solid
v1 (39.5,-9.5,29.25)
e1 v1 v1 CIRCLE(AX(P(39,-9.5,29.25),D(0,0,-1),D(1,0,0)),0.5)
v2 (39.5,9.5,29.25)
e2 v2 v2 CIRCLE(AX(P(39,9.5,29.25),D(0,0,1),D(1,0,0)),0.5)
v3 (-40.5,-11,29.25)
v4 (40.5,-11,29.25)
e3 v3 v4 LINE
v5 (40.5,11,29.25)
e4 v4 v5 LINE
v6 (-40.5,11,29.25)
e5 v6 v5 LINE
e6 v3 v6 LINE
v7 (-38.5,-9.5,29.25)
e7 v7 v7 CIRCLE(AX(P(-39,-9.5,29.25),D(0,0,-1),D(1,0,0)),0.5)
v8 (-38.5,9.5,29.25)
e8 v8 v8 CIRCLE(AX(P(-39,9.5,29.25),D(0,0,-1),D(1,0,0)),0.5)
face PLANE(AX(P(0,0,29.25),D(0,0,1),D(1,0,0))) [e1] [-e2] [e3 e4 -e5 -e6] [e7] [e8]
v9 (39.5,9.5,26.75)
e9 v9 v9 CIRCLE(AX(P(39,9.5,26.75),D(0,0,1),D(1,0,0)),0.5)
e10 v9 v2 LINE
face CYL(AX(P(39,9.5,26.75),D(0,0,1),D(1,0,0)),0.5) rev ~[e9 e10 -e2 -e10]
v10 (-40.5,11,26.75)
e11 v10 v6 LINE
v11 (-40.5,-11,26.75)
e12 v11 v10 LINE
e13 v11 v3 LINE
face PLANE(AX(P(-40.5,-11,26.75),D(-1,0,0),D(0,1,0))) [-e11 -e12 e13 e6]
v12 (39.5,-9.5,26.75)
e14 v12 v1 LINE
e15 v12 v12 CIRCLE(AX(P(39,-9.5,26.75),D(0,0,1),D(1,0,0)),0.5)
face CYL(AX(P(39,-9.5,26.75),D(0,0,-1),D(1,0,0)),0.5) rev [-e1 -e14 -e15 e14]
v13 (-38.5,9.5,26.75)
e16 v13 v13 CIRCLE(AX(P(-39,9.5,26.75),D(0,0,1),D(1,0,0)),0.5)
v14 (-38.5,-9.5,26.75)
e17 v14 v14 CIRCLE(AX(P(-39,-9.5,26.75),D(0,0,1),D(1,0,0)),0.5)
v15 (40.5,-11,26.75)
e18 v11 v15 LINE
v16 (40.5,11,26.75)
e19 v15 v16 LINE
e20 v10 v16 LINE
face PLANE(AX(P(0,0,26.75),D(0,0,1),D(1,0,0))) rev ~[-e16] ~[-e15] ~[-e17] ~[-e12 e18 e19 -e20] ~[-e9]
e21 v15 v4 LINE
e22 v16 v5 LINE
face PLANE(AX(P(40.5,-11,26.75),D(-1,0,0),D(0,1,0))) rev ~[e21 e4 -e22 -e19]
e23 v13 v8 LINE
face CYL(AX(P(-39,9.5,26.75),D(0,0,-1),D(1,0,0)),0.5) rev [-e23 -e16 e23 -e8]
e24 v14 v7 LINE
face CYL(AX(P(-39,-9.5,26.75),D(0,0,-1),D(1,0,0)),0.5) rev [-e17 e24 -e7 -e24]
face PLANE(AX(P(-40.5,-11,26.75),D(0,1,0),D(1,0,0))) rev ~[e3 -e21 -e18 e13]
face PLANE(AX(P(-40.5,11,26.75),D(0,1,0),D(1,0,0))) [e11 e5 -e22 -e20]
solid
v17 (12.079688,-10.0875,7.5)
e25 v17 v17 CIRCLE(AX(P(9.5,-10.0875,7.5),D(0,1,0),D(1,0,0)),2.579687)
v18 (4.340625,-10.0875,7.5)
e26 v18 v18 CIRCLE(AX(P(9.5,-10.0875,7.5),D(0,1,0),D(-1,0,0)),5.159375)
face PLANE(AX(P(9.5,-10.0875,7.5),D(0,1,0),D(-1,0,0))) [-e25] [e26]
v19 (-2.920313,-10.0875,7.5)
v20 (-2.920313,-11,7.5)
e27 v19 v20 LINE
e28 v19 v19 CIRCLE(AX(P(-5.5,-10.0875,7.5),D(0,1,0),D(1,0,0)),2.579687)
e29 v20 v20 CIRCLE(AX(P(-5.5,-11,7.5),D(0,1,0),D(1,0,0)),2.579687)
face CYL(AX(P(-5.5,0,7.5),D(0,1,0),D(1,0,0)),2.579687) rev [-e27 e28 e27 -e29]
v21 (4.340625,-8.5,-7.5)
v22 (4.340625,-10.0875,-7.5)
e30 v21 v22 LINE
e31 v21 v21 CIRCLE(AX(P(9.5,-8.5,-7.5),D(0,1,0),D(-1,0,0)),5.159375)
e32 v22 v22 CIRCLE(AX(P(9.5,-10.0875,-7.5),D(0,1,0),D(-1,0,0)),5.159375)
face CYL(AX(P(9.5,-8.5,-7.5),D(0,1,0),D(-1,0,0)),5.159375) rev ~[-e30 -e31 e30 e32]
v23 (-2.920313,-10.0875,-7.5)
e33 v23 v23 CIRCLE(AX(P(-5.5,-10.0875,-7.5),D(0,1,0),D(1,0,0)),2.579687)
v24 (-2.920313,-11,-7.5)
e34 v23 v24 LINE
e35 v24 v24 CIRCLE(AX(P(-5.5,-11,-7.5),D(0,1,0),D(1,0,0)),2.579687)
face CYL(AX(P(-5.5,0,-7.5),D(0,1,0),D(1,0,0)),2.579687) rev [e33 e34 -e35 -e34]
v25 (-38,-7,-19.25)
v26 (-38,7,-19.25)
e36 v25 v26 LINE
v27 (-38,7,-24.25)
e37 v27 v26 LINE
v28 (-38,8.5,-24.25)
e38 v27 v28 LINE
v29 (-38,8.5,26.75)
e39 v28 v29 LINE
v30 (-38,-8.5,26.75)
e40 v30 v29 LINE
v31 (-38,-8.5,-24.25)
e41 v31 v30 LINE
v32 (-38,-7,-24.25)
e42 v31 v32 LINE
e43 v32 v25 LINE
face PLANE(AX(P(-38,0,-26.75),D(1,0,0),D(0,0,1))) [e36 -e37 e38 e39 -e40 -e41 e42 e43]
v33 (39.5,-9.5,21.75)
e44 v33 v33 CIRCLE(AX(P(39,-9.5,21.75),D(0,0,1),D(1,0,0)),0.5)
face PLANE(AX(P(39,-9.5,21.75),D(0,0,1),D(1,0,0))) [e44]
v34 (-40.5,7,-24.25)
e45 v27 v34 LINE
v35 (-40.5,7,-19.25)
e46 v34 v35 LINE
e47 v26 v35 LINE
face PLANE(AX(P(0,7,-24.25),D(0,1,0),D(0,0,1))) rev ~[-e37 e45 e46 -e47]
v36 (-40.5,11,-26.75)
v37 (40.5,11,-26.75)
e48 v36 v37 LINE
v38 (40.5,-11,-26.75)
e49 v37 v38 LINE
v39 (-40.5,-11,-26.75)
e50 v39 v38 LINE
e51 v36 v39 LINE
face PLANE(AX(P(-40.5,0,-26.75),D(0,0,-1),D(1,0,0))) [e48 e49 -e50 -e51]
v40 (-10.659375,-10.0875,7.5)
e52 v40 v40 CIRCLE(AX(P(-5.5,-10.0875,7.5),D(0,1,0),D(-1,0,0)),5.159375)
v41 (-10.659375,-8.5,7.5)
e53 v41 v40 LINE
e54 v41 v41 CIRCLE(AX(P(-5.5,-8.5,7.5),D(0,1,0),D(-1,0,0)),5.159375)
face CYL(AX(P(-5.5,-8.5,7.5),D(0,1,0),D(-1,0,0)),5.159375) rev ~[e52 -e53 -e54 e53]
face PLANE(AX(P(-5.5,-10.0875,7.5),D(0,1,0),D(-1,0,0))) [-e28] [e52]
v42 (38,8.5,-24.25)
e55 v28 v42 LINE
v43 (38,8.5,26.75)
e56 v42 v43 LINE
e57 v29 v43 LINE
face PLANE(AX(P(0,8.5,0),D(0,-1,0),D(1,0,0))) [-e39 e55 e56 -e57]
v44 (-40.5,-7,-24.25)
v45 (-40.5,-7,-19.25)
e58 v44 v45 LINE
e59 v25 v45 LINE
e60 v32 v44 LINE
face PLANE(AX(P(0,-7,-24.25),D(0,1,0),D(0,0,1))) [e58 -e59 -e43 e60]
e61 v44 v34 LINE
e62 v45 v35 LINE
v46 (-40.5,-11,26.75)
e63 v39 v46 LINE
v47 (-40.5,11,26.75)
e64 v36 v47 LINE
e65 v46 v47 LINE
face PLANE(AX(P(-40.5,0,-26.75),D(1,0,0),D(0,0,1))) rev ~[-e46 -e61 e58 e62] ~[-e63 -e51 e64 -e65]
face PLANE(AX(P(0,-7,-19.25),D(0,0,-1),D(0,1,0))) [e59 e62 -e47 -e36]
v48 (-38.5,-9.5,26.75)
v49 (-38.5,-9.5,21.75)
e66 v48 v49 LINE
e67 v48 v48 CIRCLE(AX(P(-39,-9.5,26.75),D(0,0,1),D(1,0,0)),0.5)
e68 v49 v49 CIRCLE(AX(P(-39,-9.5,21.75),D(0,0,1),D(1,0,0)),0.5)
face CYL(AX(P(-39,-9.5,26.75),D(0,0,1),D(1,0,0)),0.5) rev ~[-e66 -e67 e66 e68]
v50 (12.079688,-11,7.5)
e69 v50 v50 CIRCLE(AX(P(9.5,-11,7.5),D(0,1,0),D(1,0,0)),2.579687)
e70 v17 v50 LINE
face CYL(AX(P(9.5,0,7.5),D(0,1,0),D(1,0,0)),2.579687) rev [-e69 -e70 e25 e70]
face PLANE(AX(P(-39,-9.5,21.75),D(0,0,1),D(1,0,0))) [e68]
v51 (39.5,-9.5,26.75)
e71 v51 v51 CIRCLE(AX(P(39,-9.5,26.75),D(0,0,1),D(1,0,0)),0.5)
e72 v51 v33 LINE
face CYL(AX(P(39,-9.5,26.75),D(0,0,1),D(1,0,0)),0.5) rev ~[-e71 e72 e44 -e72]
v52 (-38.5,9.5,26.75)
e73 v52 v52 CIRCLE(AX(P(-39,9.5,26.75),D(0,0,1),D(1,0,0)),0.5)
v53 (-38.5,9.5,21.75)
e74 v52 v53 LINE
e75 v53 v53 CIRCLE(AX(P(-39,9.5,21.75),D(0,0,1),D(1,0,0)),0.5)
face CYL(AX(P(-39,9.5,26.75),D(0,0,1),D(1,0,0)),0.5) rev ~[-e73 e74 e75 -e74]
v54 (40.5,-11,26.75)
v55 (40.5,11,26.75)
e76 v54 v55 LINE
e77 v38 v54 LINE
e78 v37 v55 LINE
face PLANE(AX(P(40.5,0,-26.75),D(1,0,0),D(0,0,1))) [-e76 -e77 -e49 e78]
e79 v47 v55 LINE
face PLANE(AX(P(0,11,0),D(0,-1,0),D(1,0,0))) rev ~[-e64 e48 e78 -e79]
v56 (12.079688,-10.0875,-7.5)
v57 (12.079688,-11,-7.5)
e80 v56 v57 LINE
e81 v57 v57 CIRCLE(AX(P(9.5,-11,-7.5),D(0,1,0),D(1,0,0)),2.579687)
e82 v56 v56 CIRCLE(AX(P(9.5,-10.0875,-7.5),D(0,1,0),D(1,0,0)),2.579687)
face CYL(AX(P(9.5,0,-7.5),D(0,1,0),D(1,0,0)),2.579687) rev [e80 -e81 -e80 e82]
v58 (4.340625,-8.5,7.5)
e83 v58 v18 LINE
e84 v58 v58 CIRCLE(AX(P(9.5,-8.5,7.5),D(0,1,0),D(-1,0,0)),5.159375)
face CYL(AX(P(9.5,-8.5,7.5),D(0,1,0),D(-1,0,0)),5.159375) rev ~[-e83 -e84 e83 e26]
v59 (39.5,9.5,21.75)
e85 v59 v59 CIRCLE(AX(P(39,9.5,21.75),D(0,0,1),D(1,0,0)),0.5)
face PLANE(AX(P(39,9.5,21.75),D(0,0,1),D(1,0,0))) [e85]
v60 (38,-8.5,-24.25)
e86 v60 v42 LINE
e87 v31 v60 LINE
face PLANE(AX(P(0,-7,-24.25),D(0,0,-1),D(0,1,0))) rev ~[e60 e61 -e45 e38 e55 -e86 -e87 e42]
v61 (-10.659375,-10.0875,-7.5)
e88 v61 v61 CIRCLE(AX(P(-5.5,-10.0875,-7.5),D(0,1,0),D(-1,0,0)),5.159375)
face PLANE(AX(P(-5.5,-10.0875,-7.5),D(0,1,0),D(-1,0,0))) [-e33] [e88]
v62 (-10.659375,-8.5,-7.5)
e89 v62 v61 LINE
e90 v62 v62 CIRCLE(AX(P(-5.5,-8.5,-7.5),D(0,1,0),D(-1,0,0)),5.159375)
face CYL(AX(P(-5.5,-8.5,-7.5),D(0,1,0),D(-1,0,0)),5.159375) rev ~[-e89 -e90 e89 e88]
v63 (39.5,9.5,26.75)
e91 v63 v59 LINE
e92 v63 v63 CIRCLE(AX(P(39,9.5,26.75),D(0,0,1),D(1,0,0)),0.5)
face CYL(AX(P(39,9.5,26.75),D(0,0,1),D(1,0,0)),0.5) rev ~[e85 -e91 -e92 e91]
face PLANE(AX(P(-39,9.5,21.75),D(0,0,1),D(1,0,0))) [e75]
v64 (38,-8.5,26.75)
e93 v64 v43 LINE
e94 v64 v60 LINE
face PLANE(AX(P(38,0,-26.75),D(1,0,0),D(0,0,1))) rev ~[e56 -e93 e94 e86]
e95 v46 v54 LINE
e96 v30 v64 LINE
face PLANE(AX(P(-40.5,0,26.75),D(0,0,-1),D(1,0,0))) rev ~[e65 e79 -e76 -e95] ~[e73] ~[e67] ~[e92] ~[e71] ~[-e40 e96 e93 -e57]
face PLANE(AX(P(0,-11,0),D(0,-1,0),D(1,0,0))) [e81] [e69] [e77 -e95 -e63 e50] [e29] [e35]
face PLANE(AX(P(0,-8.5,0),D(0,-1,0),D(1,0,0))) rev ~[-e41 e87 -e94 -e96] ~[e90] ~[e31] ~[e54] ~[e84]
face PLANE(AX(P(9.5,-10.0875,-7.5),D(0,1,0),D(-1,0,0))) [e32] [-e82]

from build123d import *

# Parameters (mm, degrees)
F0_W      = 81
F0_H      = 53.5
F1_DEPTH  = 11
F2_T      = -2.5
F3_W      = 14
F3_H      = 5
F4_DEPTH  = 49.6
F5_R      = 2.5796875
F6_DEPTH  = 25
F8_W      = 81
F8_H      = 22
F9_DEPTH  = 2.5
F11_R     = 0.5
F12_DEPTH = 5
F10_R     = 0.5
F13_DEPTH = 5
F14_R     = 5.159375
F15_DEPTH = 1.5875


# Not quite as in the source:
# - a length typed as a fraction of an inch, garbled in the dataset ("3 / 203.2 mm" for 3/8 in), is restored


with BuildPart() as f1:
    # F0 (on Front) → F1 (new body, symmetric)
    with BuildSketch(Plane.XZ):
        Rectangle(F0_W, F0_H)
    extrude(amount=F1_DEPTH, both=True)

    # F2
    f2_openings = [f1.faces().sort_by_distance(p)[0] for p in [
        (0, 0, 26.75),
    ]]
    offset(amount=F2_T, openings=f2_openings)

    # F3 (on Right) → F4 (cut)
    with BuildSketch(Plane.YZ):
        with Locations((0, -21.75)):
            Rectangle(F3_W, F3_H)
    extrude(amount=-F4_DEPTH, mode=Mode.SUBTRACT)

    # F5 (on Front) → F6 (cut)
    with BuildSketch(Plane.XZ):
        with Locations((-5.5, -7.5)):
            Circle(F5_R)
        with Locations((9.5, -7.5)):
            Circle(F5_R)
        with Locations((9.5, 7.5)):
            Circle(F5_R)
        with Locations((-5.5, 7.5)):
            Circle(F5_R)
    extrude(amount=F6_DEPTH, mode=Mode.SUBTRACT)

    # F11 (on face) → F12 (cut)
    with BuildSketch(Plane.XY.offset(26.75)):
        with Locations((-39, 9.5)):
            Circle(F11_R)
        with Locations((-39, -9.5)):
            Circle(F11_R)
        with Locations((39, -9.5)):
            Circle(F11_R)
        with Locations((39, 9.5)):
            Circle(F11_R)
    extrude(amount=-F12_DEPTH, mode=Mode.SUBTRACT)

    # F14 (on face) → F15 (cut)
    with BuildSketch(Plane(origin=(0, -8.5, 0), x_dir=(-1, 0, 0), z_dir=(0, 1, 0))):
        with Locations((5.5, -7.5)):
            Circle(F14_R)
        with Locations((5.5, 7.5)):
            Circle(F14_R)
        with Locations((-9.5, -7.5)):
            Circle(F14_R)
        with Locations((-9.5, 7.5)):
            Circle(F14_R)
    extrude(amount=-F15_DEPTH, mode=Mode.SUBTRACT)


with BuildPart() as f9:
    # F8 (on offset) → F9 (new body)
    with BuildSketch(Plane.XY.offset(26.75)):
        Rectangle(F8_W, F8_H)
    extrude(amount=F9_DEPTH)

    # F10 (on offset) → F13 (cut, symmetric)
    with BuildSketch(Plane.XY.offset(26.75)):
        with Locations((-39, 9.5)):
            Circle(F10_R)
        with Locations((-39, -9.5)):
            Circle(F10_R)
        with Locations((39, -9.5)):
            Circle(F10_R)
        with Locations((39, 9.5)):
            Circle(F10_R)
    extrude(amount=F13_DEPTH, both=True, mode=Mode.SUBTRACT)


solid = Compound([f1.part, f9.part])
